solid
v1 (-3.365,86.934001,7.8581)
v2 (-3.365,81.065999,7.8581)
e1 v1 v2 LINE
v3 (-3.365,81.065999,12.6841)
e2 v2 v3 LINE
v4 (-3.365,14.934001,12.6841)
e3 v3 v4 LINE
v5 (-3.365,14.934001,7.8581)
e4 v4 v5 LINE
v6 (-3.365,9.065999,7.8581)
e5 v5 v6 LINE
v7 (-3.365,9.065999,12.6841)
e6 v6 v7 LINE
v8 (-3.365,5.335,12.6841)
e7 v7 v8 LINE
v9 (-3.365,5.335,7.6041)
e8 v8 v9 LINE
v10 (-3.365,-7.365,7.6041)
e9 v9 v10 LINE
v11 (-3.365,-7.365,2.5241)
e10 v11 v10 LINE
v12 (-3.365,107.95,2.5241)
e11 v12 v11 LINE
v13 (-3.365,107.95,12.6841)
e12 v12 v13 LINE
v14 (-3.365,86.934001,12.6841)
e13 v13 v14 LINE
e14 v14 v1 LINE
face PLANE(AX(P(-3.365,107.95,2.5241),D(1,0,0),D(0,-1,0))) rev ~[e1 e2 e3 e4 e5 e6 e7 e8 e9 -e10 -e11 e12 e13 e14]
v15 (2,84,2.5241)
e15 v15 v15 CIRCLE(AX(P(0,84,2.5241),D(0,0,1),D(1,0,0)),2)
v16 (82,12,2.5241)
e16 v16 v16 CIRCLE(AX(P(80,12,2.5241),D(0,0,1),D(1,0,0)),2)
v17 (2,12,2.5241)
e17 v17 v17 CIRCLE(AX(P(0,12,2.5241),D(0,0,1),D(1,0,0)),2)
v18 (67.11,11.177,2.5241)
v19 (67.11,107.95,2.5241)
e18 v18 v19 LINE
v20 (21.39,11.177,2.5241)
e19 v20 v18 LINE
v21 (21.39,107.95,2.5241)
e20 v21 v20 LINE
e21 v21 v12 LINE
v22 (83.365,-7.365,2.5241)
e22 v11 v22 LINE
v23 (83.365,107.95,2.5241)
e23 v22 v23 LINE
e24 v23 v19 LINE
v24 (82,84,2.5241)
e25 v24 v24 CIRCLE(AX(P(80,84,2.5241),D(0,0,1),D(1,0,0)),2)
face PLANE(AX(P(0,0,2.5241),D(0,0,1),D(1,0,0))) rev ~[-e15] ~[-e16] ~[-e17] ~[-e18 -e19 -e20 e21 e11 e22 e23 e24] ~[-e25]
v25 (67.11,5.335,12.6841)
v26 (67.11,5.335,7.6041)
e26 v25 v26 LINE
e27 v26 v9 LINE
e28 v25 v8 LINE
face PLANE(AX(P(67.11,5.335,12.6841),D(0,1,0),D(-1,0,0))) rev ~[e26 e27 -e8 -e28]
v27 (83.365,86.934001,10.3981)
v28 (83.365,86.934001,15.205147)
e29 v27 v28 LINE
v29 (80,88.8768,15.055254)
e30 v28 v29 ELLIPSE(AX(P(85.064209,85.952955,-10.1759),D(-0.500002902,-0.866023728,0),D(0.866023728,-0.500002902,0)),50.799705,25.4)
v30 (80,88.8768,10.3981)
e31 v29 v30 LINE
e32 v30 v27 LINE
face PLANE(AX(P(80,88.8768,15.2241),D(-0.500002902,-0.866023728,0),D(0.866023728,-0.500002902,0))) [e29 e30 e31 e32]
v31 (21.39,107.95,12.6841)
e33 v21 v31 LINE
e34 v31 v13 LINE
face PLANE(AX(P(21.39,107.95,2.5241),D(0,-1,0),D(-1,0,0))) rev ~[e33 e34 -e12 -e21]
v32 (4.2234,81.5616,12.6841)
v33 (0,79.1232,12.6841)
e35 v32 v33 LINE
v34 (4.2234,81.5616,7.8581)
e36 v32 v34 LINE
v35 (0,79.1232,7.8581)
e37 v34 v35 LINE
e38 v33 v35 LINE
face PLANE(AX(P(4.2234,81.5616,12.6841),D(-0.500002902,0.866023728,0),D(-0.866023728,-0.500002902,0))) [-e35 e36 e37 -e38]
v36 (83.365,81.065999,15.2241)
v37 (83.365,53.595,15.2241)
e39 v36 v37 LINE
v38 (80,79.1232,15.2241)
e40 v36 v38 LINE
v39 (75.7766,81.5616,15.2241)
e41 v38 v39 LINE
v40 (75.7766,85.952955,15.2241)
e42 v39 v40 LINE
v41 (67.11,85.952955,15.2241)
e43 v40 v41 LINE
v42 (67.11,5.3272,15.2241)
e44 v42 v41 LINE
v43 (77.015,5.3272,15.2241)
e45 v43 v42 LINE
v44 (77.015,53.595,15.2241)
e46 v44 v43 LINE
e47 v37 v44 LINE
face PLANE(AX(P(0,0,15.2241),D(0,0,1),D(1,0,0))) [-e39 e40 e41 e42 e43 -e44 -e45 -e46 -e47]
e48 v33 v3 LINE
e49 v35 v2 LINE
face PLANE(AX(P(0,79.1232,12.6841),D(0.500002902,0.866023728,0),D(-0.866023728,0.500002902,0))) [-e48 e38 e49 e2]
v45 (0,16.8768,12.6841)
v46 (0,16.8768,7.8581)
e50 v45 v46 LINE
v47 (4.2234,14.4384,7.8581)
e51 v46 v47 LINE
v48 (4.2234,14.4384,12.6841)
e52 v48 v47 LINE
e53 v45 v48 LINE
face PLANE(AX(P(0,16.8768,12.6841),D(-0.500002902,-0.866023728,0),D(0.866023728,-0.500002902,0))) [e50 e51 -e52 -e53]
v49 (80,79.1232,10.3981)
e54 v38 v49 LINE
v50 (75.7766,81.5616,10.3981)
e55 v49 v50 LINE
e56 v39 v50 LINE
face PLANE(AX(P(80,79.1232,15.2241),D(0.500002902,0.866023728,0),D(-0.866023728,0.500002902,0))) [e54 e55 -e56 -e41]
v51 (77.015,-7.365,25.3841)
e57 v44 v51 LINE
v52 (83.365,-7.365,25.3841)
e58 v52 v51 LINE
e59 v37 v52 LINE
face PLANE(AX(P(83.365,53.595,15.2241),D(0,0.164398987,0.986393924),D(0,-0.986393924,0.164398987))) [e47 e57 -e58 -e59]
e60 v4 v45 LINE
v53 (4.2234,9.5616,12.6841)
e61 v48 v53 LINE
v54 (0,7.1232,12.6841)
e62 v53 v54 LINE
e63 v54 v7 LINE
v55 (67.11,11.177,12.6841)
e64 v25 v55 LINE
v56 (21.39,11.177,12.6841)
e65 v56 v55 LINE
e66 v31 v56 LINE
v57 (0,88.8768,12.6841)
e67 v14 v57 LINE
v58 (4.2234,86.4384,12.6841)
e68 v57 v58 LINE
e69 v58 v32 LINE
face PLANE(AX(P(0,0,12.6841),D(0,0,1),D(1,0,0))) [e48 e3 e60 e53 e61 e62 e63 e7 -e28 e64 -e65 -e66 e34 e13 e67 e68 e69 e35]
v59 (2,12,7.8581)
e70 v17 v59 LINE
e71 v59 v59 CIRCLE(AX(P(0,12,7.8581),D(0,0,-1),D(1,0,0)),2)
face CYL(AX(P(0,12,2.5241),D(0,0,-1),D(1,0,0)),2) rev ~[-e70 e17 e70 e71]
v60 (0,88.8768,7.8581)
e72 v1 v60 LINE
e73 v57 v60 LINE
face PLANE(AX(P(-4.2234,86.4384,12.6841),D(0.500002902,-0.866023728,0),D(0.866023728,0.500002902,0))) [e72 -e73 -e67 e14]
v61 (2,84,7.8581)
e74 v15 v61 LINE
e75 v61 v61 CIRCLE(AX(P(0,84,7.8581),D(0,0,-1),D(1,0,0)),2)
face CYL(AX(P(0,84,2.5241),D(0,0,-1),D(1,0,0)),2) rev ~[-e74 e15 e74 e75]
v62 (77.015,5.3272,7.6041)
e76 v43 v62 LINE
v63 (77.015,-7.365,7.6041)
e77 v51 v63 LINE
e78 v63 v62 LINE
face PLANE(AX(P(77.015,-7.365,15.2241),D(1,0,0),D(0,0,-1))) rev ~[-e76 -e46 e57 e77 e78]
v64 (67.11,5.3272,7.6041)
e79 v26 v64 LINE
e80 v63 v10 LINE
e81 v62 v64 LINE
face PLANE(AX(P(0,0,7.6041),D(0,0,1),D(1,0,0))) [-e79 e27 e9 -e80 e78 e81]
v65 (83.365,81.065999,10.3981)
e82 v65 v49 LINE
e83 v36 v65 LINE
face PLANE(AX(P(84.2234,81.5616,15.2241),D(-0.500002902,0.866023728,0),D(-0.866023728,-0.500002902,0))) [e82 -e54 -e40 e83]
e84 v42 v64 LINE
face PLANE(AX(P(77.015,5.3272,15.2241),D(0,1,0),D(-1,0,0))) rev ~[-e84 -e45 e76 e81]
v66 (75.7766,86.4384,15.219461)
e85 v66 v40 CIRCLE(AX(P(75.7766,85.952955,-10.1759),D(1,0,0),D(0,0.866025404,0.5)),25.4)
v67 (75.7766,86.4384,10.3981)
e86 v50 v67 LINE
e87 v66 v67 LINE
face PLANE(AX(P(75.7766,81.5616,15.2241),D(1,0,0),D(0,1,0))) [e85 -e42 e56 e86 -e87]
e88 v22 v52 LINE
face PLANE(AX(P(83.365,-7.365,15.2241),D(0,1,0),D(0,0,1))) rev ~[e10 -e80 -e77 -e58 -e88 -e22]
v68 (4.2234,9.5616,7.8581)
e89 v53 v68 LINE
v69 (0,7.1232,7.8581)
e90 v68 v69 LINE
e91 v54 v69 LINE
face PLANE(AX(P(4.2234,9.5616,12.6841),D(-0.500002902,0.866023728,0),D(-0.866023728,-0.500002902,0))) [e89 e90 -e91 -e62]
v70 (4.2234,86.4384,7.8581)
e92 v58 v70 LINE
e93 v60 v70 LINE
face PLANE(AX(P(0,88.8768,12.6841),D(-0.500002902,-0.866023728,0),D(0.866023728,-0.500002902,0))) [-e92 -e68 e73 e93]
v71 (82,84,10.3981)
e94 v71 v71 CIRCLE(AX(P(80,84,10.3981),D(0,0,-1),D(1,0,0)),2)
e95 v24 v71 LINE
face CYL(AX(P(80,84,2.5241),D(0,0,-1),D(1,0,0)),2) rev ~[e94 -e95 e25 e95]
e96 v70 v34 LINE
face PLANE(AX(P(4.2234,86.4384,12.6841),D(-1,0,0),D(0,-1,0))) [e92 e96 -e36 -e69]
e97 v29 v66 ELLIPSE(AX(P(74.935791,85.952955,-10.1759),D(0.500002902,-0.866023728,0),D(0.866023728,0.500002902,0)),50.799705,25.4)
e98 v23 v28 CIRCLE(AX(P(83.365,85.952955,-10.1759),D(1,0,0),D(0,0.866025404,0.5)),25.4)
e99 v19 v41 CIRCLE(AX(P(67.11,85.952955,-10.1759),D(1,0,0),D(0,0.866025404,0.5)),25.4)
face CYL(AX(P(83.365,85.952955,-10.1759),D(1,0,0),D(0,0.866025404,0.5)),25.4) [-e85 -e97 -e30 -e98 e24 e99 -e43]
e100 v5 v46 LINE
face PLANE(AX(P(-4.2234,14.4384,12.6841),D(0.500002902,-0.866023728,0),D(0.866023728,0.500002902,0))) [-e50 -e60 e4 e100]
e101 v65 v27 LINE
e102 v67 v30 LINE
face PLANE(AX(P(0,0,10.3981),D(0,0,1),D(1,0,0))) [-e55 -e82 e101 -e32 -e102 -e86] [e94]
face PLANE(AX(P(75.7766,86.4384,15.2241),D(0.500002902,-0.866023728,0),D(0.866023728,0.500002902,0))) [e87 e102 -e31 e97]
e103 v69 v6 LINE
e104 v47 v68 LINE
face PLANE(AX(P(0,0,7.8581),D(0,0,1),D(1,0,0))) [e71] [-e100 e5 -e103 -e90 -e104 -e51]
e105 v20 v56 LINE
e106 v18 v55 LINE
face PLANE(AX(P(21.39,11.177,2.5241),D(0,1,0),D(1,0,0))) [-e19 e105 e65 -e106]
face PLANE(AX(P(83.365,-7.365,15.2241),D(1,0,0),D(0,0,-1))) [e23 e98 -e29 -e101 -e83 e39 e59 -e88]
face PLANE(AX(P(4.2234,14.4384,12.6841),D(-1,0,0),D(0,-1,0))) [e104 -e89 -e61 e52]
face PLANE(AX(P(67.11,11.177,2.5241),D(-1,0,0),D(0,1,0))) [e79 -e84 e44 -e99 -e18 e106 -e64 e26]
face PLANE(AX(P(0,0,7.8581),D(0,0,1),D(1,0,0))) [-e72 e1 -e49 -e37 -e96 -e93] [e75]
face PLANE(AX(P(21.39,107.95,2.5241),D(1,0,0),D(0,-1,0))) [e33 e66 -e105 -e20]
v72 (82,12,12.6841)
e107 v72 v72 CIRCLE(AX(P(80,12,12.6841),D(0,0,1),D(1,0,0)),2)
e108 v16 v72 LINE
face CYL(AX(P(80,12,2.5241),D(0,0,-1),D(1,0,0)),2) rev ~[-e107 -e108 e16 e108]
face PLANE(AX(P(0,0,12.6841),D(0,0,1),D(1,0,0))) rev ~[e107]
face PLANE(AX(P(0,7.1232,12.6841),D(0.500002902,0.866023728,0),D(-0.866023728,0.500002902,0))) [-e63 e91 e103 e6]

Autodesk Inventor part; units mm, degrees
ref_plane "YZ Plane" through (0, 0, 0) normal (1, 0, 0) x (0, 1, 0)
ref_plane "XZ Plane" through (0, 0, 0) normal (0, 1, 0) x (-1, 0, 0)
ref_plane "Work Plane1" through (0, 0, 2.5241) normal (0, 0, 1) x (1, 0, 0)
sketch "Sketch1" plane through (0, 0, 2.5241) normal (0, 0, 1) x (1, 0, 0)
  line L0 (-4, 272) -> (-4, -8) construction
  line L1 (4, 272) -> (4, -8) construction
  line L2 (76, 272) -> (76, -8) construction
  line L3 (84, 272) -> (84, -8) construction
  line L4 (84, -8) -> (-4, -8) construction
  line L5 (84, 106) -> (80, 106) construction
  line L6 (80, 110) -> (76, 110) construction
  line L7 (-3.365, 272) -> (-3.365, -7.365) construction
  line L8 (-3.365, -7.365) -> (83.365, -7.365) construction
  line L9 (83.365, -7.365) -> (83.365, 272) construction
  line L10 (-3.365, -7.365) -> (83.365, -7.365)
  line L11 (83.365, -7.365) -> (83.365, 107.95)
  line L12 (-3.365, 107.95) -> (-3.365, -7.365)
  circle A0 centre (0, 12) radius 2
  circle A1 centre (80, 12) radius 2
  circle A2 centre (0, 84) radius 2
  circle A3 centre (80, 84) radius 2
  line L13 (21.39, 107.95) -> (21.39, 11.177)
  line L14 (21.39, 11.177) -> (67.11, 11.177)
  line L15 (67.11, 11.177) -> (67.11, 107.95)
  line L16 (83.365, 107.95) -> (67.11, 107.95)
  line L17 (21.39, 107.95) -> (-3.365, 107.95)
  point P0 (0, 0)
  dimension "d0" = 0.635
  dimension "d1" = 8.89
  dimension "d2" = 45.72
  dimension "d18" = 18.542
extrude "Extrusion1" add sketch "Sketch1" along normal blind 10.16
sketch "Sketch2" plane through (0, 0, 12.6841) normal (0, 0, 1) x (1, 0, 0)
  line L0 (83.365, 107.95) -> (67.11, 107.95) projected
  line L1 (83.365, -7.365) -> (83.365, 107.95) projected
  line L2 (67.11, 107.95) -> (83.365, 107.95)
  line L3 (83.365, 107.95) -> (83.365, 23.8125)
  line L4 (67.11, 23.8125) -> (67.11, 107.95)
  circle A0 centre (80, 84) radius 2 projected
  circle A1 centre (80, 84) radius 1.9939
  line L5 (83.365, 23.8125) -> (83.365, -7.365)
  line L6 (83.365, -7.365) -> (67.11, -7.365)
  line L7 (67.11, -7.365) -> (67.11, 23.8125)
  point P0 (0, 0)
  dimension "d5" = 3.9878
extrude "Extrusion2" add sketch "Sketch2" along normal blind 2.54 contours L1 L6 L7 L4 L0
fillet "Fillet1" radius 25.4 1 edges at (75.2375, 107.95, 15.2241)
sketch "Sketch3" plane through (0, 0, 12.6841) normal (0, 0, 1) x (1, 0, 0)
  circle A0 centre (0, 12) radius 2 construction
  circle A1 centre (0, 12) radius 4.8768 construction
  circle A2 centre (0, 84) radius 2 construction
  circle A3 centre (0, 84) radius 4.8768 construction
  circle A4 centre (80, 12) radius 2 construction
  line L0 (0, 16.8768) -> (4.2234, 14.4384)
  line L1 (4.2234, 14.4384) -> (4.2234, 9.5616)
  line L2 (4.2234, 9.5616) -> (0, 7.1232)
  line L3 (0, 7.1232) -> (-4.2234, 9.5616)
  line L4 (-4.2234, 9.5616) -> (-4.2234, 14.4384)
  line L5 (-4.2234, 14.4384) -> (0, 16.8768)
  line L6 (0, 88.8768) -> (4.2234, 86.4384)
  line L7 (4.2234, 86.4384) -> (4.2234, 81.5616)
  line L8 (4.2234, 81.5616) -> (0, 79.1232)
  line L9 (0, 79.1232) -> (-4.2234, 81.5616)
  line L10 (-4.2234, 81.5616) -> (-4.2234, 86.4384)
  line L11 (-4.2234, 86.4384) -> (0, 88.8768)
  point P0 (0, 0)
  dimension "d9" = 9.7536
  dimension "d10" = 9.7536
extrude "Extrusion3" cut sketch "Sketch3" against normal blind 4.826
sketch "Sketch4" plane through (0, 0, 15.2241) normal (0, 0, 1) x (1, 0, 0)
  circle A0 centre (80, 84) radius 2 construction
  circle A1 centre (80, 84) radius 4.8768 construction
  line L0 (80, 88.8768) -> (84.2234, 86.4384)
  line L1 (84.2234, 86.4384) -> (84.2234, 81.5616)
  line L2 (84.2234, 81.5616) -> (80, 79.1232)
  line L3 (80, 79.1232) -> (75.7766, 81.5616)
  line L4 (75.7766, 81.5616) -> (75.7766, 86.4384)
  line L5 (75.7766, 86.4384) -> (80, 88.8768)
  point P0 (0, 0)
  dimension "d14" = 9.7536
extrude "Extrusion4" cut sketch "Sketch4" against normal blind 4.826
sketch "Sketch5" plane through (0, 0, 12.6841) normal (0, 0, 1) x (1, 0, 0)
  line L0 (-3.365, -7.365) -> (67.11, -7.365) projected
  line L1 (-3.365, -7.365) -> (67.11, -7.365)
  line L2 (67.11, 5.335) -> (-3.365, 5.335)
  line L3 (-3.365, 5.335) -> (-3.365, -7.365)
  line L4 (67.11, 5.335) -> (67.11, -7.365)
  line L5 (-3.365, -7.365) -> (83.365, -7.365) projected
  point P0 (0, 0)
extrude "Extrusion5" cut sketch "Sketch5" against normal blind 5.08
sketch "Sketch13" plane through (83.365, -7.365, 15.2241) normal (1, 0, 0) x (0, 0, -1)
  line L0 (0, 0) -> (7.62, 0) projected
  line L1 (0, 0) -> (-10.16, 0)
  line L2 (0, 93.318) -> (0, 0) projected
  line L3 (0, 0) -> (0, 60.96)
  line L4 (0, 60.96) -> (-10.16, 0)
  point P0 (15.2241, 7.365)
  dimension "d54" = 10.16
  dimension "d55" = 60.96
extrude "Extrusion13" add sketch "Sketch13" against normal blind 6.35
sketch "Sketch14" plane through (0, 0, 15.2241) normal (0, 0, 1) x (1, 0, 0)
  line L0 (67.11, -7.365) -> (77.015, -7.365) projected
  line L1 (77.015, -7.365) -> (77.015, 53.595) projected
  line L2 (67.11, -7.365) -> (77.015, -7.365)
  line L3 (77.015, -7.365) -> (77.015, 5.3272)
  line L4 (77.015, 5.3272) -> (67.11, 5.3272)
  line L5 (67.11, 5.3272) -> (67.11, -7.365)
  point P0 (0, 0)
extrude "Extrusion14" cut sketch "Sketch14" against normal up to surface (7.62 mm away)
properties part number "Back Wall"
